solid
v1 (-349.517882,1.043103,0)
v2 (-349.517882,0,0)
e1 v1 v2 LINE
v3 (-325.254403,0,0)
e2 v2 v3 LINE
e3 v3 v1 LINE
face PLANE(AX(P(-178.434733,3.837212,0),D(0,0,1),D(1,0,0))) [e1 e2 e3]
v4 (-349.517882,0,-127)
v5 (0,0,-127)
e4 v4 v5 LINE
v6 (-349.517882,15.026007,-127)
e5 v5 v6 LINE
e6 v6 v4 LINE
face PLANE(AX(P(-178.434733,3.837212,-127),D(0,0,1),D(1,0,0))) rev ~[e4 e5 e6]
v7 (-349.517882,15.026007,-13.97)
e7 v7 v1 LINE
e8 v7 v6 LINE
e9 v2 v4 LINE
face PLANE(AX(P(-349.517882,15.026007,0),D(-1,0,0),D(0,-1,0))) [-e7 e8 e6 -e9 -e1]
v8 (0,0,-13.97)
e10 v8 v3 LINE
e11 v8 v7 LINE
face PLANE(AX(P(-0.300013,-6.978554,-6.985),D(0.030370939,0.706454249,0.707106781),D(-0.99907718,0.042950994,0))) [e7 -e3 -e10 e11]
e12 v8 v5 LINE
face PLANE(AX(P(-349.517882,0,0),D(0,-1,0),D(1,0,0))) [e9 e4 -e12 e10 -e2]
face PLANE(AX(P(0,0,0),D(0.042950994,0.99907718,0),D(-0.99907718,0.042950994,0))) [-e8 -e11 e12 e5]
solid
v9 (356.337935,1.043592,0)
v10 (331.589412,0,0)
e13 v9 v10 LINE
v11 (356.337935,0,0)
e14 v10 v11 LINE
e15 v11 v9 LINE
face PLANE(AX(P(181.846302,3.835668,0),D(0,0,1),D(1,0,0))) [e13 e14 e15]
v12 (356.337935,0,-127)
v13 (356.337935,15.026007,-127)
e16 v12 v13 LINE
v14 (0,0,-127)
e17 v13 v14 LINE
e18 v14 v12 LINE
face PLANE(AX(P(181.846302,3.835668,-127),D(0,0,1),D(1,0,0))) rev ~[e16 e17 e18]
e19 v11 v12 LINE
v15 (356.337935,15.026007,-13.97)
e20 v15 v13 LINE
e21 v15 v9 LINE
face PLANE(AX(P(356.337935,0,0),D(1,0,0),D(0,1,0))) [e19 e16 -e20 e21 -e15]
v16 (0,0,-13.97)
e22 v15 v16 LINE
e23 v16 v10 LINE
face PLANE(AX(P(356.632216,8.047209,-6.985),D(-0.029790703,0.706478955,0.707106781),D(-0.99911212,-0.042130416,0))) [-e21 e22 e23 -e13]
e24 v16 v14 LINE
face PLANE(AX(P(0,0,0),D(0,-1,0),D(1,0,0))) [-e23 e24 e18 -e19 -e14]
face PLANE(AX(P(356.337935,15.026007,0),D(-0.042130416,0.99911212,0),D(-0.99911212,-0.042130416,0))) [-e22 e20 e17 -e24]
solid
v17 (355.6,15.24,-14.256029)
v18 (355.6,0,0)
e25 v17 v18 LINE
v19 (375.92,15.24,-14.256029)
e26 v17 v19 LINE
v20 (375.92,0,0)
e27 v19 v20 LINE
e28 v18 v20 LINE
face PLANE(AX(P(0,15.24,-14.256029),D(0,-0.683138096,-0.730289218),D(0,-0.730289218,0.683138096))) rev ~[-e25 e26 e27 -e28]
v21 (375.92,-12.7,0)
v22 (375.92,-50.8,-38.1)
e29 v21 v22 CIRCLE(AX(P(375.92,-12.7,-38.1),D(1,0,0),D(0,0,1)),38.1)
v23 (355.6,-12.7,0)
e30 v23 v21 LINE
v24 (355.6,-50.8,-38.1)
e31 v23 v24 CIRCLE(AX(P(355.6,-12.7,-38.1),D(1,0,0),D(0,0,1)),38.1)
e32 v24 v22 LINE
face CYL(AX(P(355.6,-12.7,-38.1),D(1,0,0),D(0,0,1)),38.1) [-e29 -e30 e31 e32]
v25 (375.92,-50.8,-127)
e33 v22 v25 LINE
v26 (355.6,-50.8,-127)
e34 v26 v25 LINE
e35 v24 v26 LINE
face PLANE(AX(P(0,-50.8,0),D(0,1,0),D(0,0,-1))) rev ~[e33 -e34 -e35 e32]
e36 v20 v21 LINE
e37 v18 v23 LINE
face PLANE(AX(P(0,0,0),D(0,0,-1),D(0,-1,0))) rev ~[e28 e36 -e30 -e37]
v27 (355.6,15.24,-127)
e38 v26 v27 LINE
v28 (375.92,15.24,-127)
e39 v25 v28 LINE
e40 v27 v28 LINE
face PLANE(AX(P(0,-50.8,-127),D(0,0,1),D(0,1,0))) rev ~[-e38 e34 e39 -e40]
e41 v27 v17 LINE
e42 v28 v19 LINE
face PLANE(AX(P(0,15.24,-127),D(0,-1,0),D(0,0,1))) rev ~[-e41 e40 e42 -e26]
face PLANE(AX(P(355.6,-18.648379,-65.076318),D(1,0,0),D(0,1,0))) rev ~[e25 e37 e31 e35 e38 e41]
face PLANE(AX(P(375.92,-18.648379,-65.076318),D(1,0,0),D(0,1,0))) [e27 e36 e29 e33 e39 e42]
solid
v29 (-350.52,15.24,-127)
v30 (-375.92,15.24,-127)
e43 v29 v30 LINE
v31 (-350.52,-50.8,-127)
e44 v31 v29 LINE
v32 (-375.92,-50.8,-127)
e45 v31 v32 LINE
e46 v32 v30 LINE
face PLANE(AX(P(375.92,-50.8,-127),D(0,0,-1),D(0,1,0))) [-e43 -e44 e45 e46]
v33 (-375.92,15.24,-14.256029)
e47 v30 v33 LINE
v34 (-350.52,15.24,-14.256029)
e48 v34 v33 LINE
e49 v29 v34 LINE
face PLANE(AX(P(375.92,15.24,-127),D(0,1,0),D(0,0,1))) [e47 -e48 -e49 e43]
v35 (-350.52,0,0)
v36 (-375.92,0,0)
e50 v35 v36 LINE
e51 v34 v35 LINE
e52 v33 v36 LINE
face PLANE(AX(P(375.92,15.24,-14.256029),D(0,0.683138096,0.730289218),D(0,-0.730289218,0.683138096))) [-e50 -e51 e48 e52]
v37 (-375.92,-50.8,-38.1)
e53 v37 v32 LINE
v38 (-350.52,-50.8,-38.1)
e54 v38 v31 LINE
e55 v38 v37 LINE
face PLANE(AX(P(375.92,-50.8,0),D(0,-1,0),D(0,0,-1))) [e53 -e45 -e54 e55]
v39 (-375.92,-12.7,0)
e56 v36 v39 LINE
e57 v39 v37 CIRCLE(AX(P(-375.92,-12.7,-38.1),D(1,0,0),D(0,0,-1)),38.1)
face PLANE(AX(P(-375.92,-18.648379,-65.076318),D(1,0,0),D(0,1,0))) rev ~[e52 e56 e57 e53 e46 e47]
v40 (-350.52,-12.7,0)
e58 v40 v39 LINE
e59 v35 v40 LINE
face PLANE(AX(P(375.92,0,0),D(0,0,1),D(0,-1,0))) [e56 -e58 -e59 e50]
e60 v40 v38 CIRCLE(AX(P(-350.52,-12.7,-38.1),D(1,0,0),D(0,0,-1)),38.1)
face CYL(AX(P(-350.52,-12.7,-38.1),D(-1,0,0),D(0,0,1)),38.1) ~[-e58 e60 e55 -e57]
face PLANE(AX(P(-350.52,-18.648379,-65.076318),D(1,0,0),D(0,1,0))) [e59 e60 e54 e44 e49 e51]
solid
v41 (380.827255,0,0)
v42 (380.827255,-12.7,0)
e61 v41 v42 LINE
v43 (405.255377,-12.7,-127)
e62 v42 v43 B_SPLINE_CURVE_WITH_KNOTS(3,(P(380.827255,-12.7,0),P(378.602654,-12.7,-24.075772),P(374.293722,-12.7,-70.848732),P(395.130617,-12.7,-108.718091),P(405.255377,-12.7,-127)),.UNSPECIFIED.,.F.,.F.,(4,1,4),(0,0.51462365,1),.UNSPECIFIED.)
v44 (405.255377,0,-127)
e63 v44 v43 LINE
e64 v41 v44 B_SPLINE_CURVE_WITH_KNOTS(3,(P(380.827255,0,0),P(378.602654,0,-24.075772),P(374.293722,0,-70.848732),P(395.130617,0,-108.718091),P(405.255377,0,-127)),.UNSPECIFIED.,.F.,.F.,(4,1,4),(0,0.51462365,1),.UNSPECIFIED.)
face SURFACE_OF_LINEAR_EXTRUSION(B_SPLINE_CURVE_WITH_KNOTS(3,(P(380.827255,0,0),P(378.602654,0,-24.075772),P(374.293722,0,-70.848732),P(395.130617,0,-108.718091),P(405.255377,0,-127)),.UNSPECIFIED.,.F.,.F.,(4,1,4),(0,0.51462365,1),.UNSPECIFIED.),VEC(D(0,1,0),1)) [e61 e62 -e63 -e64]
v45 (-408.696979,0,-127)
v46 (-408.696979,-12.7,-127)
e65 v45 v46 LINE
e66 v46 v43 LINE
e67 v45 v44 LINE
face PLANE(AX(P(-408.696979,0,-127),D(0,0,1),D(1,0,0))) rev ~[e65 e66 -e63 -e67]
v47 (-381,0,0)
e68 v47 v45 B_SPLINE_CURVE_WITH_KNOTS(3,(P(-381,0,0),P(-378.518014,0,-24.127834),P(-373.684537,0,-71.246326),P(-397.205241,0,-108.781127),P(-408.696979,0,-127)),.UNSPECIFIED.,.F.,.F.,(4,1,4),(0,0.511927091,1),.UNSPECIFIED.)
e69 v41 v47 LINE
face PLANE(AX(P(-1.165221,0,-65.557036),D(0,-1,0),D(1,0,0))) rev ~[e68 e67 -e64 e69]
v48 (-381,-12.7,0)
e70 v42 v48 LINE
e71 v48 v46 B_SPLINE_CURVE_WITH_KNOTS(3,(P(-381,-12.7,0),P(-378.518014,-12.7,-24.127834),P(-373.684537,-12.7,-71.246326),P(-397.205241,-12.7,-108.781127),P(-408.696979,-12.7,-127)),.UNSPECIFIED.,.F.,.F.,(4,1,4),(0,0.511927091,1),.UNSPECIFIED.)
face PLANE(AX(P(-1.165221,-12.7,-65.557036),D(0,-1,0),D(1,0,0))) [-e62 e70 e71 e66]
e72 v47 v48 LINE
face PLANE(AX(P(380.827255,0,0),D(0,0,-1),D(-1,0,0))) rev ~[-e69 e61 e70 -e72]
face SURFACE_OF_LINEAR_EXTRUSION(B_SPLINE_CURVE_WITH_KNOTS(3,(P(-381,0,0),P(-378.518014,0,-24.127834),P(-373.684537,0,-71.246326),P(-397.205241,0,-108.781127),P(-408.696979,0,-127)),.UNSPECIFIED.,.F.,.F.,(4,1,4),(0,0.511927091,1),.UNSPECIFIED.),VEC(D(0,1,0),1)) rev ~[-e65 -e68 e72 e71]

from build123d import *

# Parameters (mm, degrees)
F2_DEPTH  = 12.7
F3_DEPTH  = 375.92
F4_DEPTH  = 355.6
F5_DEPTH  = 751.84
F6_DEPTH  = 726.44
F8_DEPTH  = 127
F9_SIZE   = 13.97
F9_2_SIZE = 13.97
F10_R     = 38.1
F10_2_R   = 38.1


with BuildPart() as f2:
    # F0 (on Front) → F2 (new body)
    with BuildSketch(Plane.XZ):
        with BuildLine():
            Line((380.8272553887, 0), (0, 0))
            Line((0, 0), (-381, 0))
            add(Edge.make_bspline(
                [(-381, 0), (-378.5180144942, -24.1278339391), (-373.6845366605, -71.2463261626), (-397.2052409969, -108.7811267769), (-408.6969792843, -127)],
                knots=[0, 0, 0, 0, 0.5119270914, 1, 1, 1, 1], degree=3))
            Line((-408.6969792843, -127), (405.2553772926, -127))
            add(Edge.make_bspline(
                [(380.8272553887, 0), (378.6026539617, -24.075771659), (374.2937220743, -70.8487324495), (395.1306170121, -108.7180910096), (405.2553772926, -127)],
                knots=[0, 0, 0, 0, 0.5146236499, 1, 1, 1, 1], degree=3))
        make_face()
    extrude(amount=F2_DEPTH)


with BuildPart() as f3:
    # F1 (on Right) → F3 (new body)
    with BuildSketch(Plane.YZ):
        Polygon((15.24, -14.2560294469), (0, 0), (-50.8, 0), (-50.8, -75.6412135187), (-50.8, -127), (15.24, -127), (15.24, -75.6412135187), align=None)
    extrude(amount=F3_DEPTH)

    # F4 (cut): a face of the model
    f4_faces = [f3.faces().sort_by_distance(p)[0] for p in [
        (0, -18.1466325136, -64.2708991879),
    ]]
    extrude(f4_faces, amount=-F4_DEPTH, mode=Mode.SUBTRACT)


with BuildPart() as f5:
    # F5 (new): a face of the model
    f5_faces = [f3.part.faces().sort_by_distance(p)[0] for p in [
        (375.92, -18.1466325136, -64.2708991879),
    ]]
    extrude(f5_faces, amount=-F5_DEPTH)

    # F6 (cut): a face of the model
    f6_faces = [f3.part.faces().sort_by_distance(p)[0] for p in [
        (375.92, -18.1466325136, -64.2708991879),
    ]]
    extrude(f6_faces, amount=-F6_DEPTH, mode=Mode.SUBTRACT)

    # F10#2
    f10_2_edges = [f5.edges().sort_by_distance(p)[0] for p in [
        (-363.22, -50.8, 0),
    ]]
    fillet(f10_2_edges, radius=F10_2_R)


with BuildPart() as f8:
    # F7 (on Top) → F8 (new body)
    with BuildSketch(Plane.XY):
        Polygon((-349.5178818703, 0), (0, 0), (-349.5178818703, 15.0260068476), align=None)
    extrude(amount=-F8_DEPTH)

    # F9
    f9_edges = [f8.edges().sort_by_distance(p)[0] for p in [
        (-174.758941, 7.513003, 0),
    ]]
    chamfer(f9_edges, length=F9_SIZE)


with BuildPart() as f8b:
    # F7 (on Top) → F8, piece 2 (new body)
    with BuildSketch(Plane.XY):
        Polygon((356.3379347324, 15.0260068476), (0, 0), (356.3379347324, 0), align=None)
    extrude(amount=-F8_DEPTH)

    # F9#2
    f9_2_edges = [f8b.edges().sort_by_distance(p)[0] for p in [
        (178.168967, 7.513003, 0),
    ]]
    chamfer(f9_2_edges, length=F9_2_SIZE)


with BuildPart() as f3_1:
    add(f3.part)

    # F10
    f10_edges = [f3_1.edges().sort_by_distance(p)[0] for p in [
        (365.76, -50.8, 0),
    ]]
    fillet(f10_edges, radius=F10_R)


solid = Compound([f2.part, f5.part, f8.part, f8b.part, f3_1.part])
